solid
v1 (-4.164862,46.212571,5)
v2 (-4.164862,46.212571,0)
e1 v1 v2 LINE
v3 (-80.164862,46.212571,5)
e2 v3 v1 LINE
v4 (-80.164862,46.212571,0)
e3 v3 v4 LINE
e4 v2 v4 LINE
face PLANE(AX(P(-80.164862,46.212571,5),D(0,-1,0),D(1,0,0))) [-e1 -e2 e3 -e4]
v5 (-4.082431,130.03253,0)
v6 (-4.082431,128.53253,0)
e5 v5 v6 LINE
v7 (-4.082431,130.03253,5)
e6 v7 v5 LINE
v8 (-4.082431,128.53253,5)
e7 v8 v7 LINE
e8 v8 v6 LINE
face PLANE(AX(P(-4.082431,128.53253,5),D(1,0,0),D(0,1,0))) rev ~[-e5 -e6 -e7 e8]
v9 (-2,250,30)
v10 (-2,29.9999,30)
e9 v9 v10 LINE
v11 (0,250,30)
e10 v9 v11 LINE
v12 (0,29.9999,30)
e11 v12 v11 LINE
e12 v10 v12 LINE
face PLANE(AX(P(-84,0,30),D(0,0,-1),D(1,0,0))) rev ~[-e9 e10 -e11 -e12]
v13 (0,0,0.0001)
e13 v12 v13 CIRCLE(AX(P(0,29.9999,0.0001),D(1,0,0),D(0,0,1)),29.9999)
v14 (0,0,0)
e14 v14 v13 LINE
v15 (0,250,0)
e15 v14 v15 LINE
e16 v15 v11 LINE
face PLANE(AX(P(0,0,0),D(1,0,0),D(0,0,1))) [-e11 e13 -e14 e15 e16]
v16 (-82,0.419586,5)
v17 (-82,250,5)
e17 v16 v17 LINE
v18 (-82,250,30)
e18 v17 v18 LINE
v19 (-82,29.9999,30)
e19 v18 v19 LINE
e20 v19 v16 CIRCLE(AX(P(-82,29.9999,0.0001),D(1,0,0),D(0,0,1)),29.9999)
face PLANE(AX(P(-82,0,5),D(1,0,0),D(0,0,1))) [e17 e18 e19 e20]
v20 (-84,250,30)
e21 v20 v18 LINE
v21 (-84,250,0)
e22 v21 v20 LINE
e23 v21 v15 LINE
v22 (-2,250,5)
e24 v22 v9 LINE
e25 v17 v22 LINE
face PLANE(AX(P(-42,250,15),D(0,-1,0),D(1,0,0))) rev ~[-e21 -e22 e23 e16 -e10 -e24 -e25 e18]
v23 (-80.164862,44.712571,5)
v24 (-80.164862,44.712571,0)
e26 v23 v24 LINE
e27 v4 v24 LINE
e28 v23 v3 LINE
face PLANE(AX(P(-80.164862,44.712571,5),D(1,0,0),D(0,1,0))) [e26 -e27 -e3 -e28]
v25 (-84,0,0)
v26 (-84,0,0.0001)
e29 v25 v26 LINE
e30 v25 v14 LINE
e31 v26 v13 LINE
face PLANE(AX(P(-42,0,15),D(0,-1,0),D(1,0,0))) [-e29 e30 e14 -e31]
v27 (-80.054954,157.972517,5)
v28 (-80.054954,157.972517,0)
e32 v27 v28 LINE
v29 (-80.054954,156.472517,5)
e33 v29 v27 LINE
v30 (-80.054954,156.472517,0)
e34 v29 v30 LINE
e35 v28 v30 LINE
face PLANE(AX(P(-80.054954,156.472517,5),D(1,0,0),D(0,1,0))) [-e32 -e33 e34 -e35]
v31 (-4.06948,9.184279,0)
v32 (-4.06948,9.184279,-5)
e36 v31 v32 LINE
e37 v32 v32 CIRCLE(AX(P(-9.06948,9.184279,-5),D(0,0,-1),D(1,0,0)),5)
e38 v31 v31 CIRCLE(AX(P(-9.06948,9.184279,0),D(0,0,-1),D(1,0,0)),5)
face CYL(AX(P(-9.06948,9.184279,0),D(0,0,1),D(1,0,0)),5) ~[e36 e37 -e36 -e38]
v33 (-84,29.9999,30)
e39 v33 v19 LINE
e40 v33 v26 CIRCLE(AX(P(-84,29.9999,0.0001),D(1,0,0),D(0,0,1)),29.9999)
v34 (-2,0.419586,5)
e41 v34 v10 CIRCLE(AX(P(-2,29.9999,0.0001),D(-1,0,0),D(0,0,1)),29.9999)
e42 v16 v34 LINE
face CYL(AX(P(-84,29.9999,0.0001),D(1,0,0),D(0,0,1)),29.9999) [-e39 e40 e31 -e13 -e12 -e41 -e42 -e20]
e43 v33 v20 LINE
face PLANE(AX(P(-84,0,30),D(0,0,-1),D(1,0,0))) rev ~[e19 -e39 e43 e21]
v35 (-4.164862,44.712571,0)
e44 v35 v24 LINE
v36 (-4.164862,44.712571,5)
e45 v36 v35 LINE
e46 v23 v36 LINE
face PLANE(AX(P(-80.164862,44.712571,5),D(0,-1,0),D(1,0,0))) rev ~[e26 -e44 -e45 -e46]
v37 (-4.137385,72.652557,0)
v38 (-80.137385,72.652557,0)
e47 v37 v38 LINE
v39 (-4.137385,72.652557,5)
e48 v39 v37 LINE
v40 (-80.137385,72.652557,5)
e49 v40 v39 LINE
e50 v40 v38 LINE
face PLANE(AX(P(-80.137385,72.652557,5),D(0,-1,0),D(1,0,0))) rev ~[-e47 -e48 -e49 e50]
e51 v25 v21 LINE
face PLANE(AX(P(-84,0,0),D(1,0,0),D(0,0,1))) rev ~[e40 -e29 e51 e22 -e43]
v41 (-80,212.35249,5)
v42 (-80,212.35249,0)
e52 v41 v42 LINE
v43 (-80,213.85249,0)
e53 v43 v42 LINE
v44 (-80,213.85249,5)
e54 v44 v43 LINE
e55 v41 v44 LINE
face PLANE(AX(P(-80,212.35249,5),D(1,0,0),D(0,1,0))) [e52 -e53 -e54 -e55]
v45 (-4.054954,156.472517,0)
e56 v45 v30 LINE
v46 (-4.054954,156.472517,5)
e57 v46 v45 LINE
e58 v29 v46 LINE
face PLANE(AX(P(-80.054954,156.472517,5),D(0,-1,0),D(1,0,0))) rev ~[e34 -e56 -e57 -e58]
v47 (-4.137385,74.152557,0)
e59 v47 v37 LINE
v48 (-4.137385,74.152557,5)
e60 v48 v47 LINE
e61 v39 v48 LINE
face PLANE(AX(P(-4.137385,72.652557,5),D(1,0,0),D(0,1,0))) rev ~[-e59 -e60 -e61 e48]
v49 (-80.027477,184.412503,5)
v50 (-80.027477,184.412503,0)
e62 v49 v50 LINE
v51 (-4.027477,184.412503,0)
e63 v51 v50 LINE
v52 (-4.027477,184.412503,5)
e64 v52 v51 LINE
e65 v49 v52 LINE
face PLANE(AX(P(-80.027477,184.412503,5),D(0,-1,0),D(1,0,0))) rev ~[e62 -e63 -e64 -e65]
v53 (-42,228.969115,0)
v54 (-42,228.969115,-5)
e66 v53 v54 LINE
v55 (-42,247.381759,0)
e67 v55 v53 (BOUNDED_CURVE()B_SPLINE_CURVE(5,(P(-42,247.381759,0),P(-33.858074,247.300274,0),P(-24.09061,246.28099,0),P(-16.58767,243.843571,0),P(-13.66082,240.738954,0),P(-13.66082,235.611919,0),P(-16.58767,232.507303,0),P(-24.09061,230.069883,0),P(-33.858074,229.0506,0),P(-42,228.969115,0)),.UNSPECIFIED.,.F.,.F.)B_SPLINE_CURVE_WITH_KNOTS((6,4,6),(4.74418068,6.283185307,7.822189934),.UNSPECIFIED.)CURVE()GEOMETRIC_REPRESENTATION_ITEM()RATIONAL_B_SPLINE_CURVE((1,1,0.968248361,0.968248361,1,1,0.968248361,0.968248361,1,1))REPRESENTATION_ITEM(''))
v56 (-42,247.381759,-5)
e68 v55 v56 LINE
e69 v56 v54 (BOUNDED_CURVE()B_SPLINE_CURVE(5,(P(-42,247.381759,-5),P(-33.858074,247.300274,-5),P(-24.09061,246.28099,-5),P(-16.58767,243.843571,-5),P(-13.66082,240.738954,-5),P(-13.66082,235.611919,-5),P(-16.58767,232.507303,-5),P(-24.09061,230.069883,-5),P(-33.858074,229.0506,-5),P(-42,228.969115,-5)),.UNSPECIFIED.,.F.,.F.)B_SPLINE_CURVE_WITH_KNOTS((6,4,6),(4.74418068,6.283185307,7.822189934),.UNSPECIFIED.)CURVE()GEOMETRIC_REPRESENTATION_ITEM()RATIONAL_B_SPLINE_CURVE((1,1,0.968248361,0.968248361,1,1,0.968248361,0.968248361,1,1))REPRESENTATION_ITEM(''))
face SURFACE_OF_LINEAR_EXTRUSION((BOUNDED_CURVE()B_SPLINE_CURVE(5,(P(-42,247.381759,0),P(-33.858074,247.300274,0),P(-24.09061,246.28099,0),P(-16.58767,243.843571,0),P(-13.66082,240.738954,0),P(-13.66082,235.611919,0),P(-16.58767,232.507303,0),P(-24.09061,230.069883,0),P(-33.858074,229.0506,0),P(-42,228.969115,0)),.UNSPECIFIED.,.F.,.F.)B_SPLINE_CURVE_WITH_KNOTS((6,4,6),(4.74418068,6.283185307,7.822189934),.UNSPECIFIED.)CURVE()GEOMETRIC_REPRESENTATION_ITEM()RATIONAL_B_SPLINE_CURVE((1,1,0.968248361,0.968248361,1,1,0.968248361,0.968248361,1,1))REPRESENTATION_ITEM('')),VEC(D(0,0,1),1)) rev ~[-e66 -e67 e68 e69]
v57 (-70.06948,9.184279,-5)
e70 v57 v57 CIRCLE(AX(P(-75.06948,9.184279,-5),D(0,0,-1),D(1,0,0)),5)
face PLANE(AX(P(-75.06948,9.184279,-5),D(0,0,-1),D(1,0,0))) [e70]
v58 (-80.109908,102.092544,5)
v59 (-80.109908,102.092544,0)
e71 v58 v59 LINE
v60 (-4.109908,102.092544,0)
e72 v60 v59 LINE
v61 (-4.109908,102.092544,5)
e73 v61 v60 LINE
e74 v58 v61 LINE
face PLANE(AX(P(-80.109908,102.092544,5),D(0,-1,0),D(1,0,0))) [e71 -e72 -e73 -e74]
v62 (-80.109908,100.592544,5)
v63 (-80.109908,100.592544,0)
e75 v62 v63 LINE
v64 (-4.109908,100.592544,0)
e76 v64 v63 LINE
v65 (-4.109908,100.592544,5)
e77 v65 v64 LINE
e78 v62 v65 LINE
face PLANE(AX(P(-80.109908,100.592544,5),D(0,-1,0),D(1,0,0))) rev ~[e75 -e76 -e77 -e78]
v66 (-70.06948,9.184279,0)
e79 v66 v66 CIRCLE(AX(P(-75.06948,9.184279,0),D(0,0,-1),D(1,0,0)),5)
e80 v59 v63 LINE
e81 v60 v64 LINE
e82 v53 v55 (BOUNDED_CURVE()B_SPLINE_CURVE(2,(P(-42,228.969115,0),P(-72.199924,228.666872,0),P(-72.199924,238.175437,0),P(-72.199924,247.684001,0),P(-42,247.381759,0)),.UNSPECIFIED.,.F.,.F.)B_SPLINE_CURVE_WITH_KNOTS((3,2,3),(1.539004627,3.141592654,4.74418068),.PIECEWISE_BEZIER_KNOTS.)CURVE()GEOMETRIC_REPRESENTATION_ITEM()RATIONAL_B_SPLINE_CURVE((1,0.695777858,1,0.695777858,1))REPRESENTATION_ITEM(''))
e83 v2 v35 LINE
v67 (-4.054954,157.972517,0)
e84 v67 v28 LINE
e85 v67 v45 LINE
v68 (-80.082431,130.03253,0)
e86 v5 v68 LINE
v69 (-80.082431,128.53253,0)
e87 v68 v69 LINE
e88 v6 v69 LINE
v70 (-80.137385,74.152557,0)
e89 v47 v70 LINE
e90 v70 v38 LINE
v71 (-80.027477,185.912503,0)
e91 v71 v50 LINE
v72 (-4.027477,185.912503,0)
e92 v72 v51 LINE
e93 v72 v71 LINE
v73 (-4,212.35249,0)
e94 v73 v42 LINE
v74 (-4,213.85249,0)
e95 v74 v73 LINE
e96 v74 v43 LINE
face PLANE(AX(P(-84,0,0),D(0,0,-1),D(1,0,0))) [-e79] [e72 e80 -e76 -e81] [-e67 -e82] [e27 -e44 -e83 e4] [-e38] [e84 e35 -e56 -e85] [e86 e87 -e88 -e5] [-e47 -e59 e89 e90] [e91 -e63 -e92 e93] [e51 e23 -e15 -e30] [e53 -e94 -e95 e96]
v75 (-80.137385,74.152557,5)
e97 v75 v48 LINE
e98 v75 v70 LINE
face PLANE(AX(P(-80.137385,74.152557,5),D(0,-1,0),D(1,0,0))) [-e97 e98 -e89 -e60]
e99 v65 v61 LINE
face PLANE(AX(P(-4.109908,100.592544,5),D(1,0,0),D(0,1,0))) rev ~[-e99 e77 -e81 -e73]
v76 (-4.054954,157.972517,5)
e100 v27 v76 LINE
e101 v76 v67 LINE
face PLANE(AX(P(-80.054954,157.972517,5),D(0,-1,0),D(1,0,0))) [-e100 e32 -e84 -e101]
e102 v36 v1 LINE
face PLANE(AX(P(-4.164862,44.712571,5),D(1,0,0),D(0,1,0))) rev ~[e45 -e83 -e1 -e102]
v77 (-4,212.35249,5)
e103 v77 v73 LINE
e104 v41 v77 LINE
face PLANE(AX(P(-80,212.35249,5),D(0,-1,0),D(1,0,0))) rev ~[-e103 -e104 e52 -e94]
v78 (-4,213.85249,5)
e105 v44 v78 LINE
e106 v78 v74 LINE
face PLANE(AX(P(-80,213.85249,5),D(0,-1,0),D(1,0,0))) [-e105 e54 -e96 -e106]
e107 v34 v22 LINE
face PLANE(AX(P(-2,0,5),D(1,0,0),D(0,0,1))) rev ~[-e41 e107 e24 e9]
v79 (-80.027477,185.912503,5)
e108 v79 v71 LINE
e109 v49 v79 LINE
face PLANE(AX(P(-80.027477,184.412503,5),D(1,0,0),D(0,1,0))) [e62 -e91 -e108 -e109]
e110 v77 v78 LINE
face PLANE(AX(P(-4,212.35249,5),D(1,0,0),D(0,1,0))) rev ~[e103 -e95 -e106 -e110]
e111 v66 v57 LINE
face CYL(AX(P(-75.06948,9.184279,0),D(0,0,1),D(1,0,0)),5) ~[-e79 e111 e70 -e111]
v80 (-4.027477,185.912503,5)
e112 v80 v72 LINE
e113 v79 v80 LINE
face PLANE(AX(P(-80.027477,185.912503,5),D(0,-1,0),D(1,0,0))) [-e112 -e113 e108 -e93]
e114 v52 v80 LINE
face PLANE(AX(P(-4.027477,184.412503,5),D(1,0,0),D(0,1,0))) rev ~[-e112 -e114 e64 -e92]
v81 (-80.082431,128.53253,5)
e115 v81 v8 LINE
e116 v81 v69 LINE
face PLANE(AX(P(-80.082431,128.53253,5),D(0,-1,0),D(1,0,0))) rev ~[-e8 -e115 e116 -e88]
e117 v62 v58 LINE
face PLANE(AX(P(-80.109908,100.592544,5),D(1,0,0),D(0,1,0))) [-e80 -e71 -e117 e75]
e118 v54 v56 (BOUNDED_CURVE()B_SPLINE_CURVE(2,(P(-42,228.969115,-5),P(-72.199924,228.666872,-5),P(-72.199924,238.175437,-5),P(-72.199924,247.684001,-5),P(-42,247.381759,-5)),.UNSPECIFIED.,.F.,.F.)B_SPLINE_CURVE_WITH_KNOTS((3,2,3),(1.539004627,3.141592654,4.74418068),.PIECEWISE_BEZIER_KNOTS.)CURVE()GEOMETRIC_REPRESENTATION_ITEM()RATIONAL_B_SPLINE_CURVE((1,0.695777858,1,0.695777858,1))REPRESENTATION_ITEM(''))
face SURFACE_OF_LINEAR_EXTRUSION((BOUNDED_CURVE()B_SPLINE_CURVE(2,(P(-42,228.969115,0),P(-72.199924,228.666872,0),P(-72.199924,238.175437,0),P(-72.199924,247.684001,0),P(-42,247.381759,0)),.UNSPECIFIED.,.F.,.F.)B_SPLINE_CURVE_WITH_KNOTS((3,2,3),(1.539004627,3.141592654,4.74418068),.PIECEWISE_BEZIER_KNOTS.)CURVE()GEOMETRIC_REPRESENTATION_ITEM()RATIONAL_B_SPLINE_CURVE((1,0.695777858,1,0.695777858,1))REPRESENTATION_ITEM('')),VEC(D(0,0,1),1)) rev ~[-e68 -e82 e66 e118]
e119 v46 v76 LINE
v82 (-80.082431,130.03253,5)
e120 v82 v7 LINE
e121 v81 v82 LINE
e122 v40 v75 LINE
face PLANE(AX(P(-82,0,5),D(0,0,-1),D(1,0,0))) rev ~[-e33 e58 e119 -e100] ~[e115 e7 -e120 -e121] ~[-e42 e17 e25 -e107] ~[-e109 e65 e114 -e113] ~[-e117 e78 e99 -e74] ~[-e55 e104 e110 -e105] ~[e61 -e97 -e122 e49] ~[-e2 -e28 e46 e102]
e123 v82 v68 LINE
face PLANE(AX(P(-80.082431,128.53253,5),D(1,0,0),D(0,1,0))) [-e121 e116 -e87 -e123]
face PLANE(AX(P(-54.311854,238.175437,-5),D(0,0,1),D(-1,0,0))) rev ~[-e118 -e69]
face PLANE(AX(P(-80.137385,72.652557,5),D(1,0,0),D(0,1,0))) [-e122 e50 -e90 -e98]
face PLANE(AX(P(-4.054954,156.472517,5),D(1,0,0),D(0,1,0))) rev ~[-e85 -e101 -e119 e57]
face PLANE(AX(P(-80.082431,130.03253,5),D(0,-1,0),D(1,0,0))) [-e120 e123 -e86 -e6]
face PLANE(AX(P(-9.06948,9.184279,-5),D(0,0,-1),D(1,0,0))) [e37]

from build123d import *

# Parameters (mm, degrees)
F0_W     = 84
F0_H     = 30
F1_DEPTH = 250
F2_W     = 80
F2_H     = 50.6085516345
F3_DEPTH = 250.001
F4_R     = 5
F5_DEPTH = 5
F6_W     = 76
F6_H     = 1.5
F7_DEPTH = 25.4
F8_F1_R  = 29.9999


# Not quite as in the source:
# - a fillet or chamfer is up to 0.001 mm smaller than in the source, because OpenCascade refuses the exact size


with BuildPart() as f1:
    # F0 (on Front) → F1 (new body)
    with BuildSketch(Plane.XZ):
        with Locations((-42, 15)):
            Rectangle(F0_W, F0_H)
    extrude(amount=-F1_DEPTH)

    # F2 (on Front) → F3 (cut, through all)
    with BuildSketch(Plane.XZ):
        with Locations((-42, 30.3042758173)):
            Rectangle(F2_W, F2_H)
    extrude(amount=-F3_DEPTH, mode=Mode.SUBTRACT)

    # F4 (on face) → F5 (join)
    with BuildSketch(Plane(origin=(0, 0, 0), x_dir=(1, 0, 0), z_dir=(0, 0, -1))):
        with Locations((-75.0694796443, -9.1842794791)):
            Circle(F4_R)
        with Locations((-9.0694796443, -9.1842794791)):
            Circle(F4_R)
        with BuildLine():
            add(Edge.make_bspline(
                [(-42, -228.9691147673), (-42, -236.5294238205), (-42, -242.7407619737), (-42, -247.3817589414)],
                knots=[0.7062379003, 0.7062379003, 0.7062379003, 0.7062379003, 0.8221337183, 0.8221337183, 0.8221337183, 0.8221337183], degree=3))
            add(Edge.make_bspline(
                [(-42, -228.9691147673), (-72.1999239177, -228.6668722572), (-72.1999239177, -238.1754368544), (-72.1999239177, -247.6840014516), (-42, -247.3817589414)],
                knots=[1.5390046272, 1.5390046272, 1.5390046272, 3.1415926536, 3.1415926536, 4.74418068, 4.74418068, 4.74418068], degree=2, weights=[1, 0.695777858, 1, 0.695777858, 1]))
        make_face()
        with BuildLine():
            add(Edge.make_bspline(
                [(-42, -247.3817589414), (-13.660820201, -247.0981388613), (-13.660820201, -238.1754368544)],
                knots=[4.74418068, 4.74418068, 4.74418068, 6.2831853072, 6.2831853072, 6.2831853072], degree=2, weights=[1, 0.7182570377, 1]))
            add(Edge.make_bspline(
                [(-13.660820201, -238.1754368544), (-13.660820201, -229.2527348474), (-42, -228.9691147673)],
                knots=[0, 0, 0, 1.5390046272, 1.5390046272, 1.5390046272], degree=2, weights=[1, 0.7182570377, 1]))
            add(Edge.make_bspline(
                [(-42, -228.9691147673), (-42, -236.5294238205), (-42, -242.7407619737), (-42, -247.3817589414)],
                knots=[0.7062379003, 0.7062379003, 0.7062379003, 0.7062379003, 0.8221337183, 0.8221337183, 0.8221337183, 0.8221337183], degree=3))
        make_face()
    extrude(amount=F5_DEPTH)

    # F6 (on face) → F7 (cut)
    with BuildSketch(Plane.XY.offset(5)):
        with Locations((-42, 213.1024897098)):
            Rectangle(F6_W, F6_H)
        with Locations((-42.0274770269, 185.1625032207)):
            Rectangle(F6_W, F6_H)
        with Locations((-42.0549540537, 157.2225167316)):
            Rectangle(F6_W, F6_H)
        with Locations((-42.1648621612, 45.462570775)):
            Rectangle(F6_W, F6_H)
        with Locations((-42.1373851343, 73.4025572642)):
            Rectangle(F6_W, F6_H)
        with Locations((-42.1099081074, 101.3425437533)):
            Rectangle(F6_W, F6_H)
        with Locations((-42.0824310806, 129.2825302424)):
            Rectangle(F6_W, F6_H)
    extrude(amount=-F7_DEPTH, mode=Mode.SUBTRACT)

    # F8: fillet of radius 30 on 2 edges, made by hand

    # F8_f1 (radius 30 in the source; OpenCascade refuses exactly that, so slightly less here)
    f8_f1_edges = [f1.edges().sort_by_distance(p)[0] for p in [
        (-83, 0, 30),
    ]]
    fillet(f8_f1_edges, radius=F8_F1_R)


solid = f1.part
